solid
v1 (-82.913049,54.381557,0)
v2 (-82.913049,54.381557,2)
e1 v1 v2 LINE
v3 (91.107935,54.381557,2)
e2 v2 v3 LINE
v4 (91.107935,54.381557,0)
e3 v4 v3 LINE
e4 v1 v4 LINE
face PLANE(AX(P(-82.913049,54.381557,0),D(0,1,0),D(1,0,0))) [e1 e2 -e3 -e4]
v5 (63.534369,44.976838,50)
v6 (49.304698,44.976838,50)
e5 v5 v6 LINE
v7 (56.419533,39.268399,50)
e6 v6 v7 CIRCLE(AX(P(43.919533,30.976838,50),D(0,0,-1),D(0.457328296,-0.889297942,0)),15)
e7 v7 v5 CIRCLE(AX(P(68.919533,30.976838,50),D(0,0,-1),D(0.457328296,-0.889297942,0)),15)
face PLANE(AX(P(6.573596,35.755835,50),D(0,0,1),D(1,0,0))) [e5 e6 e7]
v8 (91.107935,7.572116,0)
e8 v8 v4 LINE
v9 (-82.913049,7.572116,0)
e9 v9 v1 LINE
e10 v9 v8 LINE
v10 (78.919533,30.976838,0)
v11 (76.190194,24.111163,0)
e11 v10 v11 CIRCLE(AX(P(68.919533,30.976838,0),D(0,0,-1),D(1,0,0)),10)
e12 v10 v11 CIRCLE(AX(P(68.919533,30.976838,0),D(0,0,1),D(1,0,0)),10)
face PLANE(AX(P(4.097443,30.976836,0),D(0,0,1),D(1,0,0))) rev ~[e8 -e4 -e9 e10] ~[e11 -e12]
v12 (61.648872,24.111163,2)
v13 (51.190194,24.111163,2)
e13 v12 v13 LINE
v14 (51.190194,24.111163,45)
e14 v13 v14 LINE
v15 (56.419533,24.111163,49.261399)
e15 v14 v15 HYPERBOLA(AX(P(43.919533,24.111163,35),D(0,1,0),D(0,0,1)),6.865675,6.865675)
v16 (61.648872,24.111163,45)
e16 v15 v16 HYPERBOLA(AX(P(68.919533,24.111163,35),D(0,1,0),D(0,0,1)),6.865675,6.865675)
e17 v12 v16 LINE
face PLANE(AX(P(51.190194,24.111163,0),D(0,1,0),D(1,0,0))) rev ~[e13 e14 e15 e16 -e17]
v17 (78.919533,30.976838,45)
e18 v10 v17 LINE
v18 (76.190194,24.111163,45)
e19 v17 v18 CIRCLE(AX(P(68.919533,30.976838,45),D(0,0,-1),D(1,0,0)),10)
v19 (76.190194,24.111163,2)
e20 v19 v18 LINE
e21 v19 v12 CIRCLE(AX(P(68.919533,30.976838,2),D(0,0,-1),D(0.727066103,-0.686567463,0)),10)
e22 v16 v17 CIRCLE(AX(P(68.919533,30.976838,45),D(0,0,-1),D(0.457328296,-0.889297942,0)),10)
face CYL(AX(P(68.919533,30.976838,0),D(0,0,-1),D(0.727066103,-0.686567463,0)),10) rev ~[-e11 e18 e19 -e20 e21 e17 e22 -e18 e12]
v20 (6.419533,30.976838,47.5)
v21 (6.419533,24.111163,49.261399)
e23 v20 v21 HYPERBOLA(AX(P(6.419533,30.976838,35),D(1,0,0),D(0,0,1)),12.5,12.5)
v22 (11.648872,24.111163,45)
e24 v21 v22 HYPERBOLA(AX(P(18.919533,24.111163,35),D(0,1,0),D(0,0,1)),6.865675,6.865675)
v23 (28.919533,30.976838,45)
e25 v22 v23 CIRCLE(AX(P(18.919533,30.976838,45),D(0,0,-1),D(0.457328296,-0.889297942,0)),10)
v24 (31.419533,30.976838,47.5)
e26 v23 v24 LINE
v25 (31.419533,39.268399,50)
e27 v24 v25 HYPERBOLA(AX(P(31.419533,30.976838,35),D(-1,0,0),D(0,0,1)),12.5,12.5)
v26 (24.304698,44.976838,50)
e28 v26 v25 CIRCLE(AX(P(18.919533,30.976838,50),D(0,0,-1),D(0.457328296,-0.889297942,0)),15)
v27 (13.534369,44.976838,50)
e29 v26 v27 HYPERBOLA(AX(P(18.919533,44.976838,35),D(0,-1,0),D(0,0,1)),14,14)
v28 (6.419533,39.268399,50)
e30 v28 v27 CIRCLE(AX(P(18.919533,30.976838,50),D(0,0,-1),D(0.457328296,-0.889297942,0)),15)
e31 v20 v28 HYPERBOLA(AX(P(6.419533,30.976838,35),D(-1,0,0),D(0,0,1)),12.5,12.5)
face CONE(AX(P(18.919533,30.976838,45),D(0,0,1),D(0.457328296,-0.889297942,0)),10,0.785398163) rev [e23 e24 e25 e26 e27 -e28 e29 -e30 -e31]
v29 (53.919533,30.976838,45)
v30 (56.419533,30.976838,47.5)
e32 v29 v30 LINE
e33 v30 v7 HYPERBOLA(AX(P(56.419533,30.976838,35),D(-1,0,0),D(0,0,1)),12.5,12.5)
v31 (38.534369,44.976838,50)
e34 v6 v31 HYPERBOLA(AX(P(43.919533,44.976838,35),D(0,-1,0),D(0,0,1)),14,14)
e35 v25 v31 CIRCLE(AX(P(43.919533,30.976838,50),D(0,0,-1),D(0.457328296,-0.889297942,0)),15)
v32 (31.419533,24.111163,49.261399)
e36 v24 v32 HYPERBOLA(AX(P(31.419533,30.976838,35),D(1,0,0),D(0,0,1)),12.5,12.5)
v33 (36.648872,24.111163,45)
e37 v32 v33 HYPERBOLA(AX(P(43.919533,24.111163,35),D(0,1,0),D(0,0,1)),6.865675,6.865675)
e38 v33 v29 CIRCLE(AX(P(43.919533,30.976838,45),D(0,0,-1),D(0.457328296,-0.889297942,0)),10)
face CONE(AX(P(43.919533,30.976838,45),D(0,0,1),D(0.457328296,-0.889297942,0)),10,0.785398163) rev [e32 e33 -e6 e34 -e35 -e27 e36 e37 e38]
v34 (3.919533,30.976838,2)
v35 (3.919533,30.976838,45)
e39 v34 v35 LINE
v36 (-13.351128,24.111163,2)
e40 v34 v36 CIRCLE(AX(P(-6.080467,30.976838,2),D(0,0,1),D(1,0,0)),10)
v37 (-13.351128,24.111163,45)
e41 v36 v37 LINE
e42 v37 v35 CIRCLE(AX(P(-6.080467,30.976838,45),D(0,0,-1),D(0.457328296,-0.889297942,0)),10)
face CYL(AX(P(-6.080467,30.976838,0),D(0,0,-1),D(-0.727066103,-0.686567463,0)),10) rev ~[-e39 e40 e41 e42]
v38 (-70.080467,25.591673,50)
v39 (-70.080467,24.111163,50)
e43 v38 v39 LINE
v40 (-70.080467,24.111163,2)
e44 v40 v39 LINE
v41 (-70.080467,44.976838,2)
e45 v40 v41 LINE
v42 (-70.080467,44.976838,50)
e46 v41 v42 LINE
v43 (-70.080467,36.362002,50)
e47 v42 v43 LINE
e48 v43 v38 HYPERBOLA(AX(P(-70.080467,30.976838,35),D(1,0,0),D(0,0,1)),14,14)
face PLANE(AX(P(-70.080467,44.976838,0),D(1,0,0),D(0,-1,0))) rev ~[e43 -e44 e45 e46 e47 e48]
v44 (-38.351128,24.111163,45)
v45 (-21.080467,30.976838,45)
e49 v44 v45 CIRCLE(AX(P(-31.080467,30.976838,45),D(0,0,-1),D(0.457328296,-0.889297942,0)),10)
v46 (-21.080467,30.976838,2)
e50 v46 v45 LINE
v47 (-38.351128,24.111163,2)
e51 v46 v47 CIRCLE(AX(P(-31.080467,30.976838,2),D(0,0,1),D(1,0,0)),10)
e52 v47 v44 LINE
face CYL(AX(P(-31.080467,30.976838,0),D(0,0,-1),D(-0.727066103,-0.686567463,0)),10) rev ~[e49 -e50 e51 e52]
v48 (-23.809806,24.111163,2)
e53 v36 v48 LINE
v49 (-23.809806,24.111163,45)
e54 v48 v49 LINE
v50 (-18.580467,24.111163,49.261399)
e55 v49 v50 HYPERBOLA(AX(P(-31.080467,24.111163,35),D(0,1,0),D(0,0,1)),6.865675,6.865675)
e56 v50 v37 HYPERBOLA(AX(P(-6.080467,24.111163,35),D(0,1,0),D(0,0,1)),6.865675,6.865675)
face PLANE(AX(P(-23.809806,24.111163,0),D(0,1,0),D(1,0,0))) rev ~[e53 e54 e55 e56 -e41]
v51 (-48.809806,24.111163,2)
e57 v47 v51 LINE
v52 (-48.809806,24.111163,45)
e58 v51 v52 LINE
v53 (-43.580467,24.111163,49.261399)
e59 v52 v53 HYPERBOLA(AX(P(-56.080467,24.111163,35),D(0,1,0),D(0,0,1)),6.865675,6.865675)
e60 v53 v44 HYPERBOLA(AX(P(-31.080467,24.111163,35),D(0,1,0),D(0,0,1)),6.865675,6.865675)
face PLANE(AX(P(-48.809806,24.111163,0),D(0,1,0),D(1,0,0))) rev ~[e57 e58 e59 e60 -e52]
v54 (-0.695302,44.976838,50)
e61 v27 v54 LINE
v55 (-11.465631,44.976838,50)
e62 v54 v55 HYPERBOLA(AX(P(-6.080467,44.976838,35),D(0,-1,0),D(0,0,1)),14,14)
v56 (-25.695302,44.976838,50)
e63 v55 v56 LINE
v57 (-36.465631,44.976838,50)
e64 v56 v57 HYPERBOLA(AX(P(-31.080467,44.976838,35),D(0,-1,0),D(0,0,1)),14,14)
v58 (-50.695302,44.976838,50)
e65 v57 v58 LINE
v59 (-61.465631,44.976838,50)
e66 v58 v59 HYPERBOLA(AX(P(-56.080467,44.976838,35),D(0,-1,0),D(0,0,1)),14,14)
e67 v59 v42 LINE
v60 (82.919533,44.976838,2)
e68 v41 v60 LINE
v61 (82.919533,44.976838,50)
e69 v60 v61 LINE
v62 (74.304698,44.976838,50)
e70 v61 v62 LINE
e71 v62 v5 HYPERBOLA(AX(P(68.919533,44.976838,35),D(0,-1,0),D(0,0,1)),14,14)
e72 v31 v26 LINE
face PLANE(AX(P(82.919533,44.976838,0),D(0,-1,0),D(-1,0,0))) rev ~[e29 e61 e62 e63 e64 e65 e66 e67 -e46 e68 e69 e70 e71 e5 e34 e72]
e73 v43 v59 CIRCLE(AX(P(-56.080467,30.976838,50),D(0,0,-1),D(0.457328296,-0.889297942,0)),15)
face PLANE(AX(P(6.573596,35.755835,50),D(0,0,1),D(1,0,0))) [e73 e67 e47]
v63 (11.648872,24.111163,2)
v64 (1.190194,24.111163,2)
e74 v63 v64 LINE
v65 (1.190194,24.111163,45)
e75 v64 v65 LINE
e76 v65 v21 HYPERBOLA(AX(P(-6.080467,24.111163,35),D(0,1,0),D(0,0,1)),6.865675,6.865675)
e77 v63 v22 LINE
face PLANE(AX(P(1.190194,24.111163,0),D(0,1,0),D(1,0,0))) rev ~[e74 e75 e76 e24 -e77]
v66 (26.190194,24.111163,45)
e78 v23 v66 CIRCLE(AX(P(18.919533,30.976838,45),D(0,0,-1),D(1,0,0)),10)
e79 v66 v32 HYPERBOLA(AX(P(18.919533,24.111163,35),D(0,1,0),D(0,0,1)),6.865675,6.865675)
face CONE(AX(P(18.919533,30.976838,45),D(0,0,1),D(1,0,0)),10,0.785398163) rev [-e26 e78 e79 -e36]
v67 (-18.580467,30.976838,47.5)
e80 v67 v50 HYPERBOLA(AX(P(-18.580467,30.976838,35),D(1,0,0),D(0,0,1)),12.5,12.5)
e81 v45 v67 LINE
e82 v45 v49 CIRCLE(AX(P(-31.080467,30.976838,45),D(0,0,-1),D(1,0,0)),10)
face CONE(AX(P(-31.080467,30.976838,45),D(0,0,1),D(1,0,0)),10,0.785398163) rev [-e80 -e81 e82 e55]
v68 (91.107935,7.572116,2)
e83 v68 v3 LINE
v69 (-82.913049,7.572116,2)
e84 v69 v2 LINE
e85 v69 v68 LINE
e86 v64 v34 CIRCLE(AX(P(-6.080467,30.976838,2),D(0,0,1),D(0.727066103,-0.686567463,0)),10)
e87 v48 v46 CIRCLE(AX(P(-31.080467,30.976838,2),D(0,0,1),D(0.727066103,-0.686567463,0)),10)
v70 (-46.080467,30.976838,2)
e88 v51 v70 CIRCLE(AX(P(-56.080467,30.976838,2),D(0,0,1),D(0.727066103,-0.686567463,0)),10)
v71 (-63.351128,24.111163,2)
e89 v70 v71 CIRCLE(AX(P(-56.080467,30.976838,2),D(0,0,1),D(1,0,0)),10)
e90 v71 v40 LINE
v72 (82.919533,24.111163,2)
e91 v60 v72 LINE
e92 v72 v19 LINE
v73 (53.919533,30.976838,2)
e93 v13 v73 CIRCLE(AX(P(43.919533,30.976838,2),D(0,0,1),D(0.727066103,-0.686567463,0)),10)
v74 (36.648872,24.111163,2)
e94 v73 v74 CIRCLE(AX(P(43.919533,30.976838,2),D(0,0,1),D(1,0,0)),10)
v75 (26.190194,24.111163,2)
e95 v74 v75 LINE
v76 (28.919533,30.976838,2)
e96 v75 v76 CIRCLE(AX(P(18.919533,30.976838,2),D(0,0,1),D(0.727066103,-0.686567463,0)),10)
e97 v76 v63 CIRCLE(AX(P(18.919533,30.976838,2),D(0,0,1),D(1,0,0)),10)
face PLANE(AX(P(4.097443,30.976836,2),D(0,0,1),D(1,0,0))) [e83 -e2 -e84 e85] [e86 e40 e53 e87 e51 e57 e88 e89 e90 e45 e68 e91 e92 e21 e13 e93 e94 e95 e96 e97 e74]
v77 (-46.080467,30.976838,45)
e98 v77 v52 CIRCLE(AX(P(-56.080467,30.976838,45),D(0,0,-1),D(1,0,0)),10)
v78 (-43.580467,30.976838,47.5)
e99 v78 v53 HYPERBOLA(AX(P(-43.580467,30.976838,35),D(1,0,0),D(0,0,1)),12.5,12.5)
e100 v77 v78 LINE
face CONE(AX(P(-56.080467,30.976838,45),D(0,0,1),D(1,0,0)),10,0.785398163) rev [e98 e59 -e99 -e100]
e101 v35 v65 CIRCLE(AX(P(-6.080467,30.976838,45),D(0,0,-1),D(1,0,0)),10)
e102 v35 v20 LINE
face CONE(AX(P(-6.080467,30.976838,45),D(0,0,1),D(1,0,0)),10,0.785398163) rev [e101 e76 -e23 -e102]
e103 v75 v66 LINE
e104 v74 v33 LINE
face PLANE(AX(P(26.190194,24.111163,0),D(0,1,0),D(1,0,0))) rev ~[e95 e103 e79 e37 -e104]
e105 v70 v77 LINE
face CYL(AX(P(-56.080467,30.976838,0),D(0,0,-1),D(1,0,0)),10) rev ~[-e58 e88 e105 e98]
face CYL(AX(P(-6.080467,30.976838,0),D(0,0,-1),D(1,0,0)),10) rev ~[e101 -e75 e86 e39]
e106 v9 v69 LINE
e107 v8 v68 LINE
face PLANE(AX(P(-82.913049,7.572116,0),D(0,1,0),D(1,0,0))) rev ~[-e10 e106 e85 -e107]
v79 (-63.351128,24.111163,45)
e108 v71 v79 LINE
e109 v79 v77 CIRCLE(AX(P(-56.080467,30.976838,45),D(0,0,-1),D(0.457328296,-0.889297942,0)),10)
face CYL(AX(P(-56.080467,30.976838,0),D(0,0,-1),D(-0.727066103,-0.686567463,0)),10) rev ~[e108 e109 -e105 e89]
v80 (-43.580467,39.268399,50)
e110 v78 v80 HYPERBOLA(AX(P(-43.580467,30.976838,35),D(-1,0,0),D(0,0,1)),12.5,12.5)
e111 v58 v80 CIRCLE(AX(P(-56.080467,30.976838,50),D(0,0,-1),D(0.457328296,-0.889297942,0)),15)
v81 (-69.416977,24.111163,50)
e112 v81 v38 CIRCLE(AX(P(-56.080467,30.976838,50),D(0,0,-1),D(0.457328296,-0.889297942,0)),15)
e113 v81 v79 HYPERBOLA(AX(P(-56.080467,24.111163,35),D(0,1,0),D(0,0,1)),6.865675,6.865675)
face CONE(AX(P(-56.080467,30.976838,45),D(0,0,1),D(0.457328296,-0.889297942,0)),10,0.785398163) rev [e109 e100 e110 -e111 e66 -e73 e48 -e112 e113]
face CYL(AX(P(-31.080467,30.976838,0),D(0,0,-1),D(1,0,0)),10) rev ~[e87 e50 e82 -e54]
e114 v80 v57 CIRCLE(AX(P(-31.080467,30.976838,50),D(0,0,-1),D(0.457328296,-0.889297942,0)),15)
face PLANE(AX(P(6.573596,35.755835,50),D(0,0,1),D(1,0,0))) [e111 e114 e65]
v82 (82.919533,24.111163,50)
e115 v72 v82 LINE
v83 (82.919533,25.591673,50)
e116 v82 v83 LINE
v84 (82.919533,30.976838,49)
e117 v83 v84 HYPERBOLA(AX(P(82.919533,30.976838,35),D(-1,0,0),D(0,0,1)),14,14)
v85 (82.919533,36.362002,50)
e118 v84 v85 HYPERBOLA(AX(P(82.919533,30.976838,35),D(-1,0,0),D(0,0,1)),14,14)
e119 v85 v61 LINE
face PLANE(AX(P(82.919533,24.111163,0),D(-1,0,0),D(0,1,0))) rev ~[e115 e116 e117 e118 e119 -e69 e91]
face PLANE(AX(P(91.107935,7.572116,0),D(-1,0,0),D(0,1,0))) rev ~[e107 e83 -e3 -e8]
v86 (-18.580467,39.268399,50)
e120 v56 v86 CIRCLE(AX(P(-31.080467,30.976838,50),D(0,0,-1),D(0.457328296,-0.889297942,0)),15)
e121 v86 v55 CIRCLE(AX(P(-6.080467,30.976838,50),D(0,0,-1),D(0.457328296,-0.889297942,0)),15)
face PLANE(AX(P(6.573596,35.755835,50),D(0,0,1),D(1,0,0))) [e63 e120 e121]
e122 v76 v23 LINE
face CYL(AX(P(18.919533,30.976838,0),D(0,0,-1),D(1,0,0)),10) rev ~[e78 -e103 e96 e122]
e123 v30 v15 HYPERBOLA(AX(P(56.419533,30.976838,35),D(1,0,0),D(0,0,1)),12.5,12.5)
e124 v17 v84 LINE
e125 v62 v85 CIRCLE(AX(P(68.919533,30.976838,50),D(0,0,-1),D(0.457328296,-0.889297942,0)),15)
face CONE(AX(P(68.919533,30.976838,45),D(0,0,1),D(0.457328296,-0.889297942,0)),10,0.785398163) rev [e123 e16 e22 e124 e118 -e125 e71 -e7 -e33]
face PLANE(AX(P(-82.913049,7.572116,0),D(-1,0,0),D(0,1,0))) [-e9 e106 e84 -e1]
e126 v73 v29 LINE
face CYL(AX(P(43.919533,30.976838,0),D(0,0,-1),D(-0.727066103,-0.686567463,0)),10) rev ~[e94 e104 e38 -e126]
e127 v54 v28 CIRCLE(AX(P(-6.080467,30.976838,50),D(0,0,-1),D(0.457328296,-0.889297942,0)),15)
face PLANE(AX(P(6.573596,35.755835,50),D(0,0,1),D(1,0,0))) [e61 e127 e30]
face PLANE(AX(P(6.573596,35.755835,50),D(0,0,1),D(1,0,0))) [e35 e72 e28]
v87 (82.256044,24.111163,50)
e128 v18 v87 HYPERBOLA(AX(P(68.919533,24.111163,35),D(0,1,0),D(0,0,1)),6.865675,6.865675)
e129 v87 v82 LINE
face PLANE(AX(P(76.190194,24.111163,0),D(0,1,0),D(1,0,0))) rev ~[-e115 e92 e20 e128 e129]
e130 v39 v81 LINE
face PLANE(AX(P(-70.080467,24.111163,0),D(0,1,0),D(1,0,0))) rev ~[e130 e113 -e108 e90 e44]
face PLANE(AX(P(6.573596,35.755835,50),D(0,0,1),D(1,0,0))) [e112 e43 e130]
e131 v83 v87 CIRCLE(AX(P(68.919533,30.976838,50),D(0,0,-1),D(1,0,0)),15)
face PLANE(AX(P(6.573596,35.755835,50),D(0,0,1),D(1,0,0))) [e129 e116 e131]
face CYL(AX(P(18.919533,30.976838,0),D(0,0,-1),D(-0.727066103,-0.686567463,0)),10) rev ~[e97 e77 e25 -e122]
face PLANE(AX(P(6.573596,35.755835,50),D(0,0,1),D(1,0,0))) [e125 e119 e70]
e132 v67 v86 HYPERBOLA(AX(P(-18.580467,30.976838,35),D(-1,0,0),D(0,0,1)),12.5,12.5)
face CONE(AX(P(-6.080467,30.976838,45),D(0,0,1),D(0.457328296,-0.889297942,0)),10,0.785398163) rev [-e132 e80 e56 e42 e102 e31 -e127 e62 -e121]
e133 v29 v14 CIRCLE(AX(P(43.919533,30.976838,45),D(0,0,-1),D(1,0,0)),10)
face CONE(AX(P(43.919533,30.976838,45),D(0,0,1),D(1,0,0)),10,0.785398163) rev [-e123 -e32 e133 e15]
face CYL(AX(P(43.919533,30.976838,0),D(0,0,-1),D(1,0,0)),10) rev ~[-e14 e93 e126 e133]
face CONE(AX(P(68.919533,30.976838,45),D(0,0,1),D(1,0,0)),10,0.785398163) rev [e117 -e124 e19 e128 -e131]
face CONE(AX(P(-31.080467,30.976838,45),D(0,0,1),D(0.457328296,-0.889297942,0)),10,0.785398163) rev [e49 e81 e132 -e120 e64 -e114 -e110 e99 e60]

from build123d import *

# Parameters (mm, degrees)
F1_DEPTH     = 50
F0_W         = 174.0209832788
F0_H         = 46.8094409443
F2_DEPTH     = 2
F3_T2_ANGLE  = 297.2148412711
F3_T4_ANGLE  = 297.2148412711
F3_T6_ANGLE  = 297.2148412711
F3_T8_ANGLE  = 297.2148412711
F3_T10_ANGLE = 297.2148412711
F3_T12_ANGLE = 297.2148412711
F3_T14_ANGLE = 117.0391625113
F3_T16_ANGLE = 117.0391625113
F3_T18_ANGLE = 117.0391625113
F3_T20_ANGLE = 117.0391625113
F3_T22_ANGLE = 117.0391625113
F3_T24_ANGLE = 117.0391625113


# Not quite as in the source:
# - a fillet or chamfer that OpenCascade refuses, or shapes differently, is made with other operations: its cross-section is extruded or revolved along the edge and cut away or added


with BuildPart() as f1:
    # F0 (on Top) → F1 (new body)
    with BuildSketch(Plane.XY):
        with BuildLine():
            ThreePointArc((-63.3511276029, 24.1111628711), (-59.7746098829, 40.2694854105), (-46.0804665685, 30.9768375009))
            ThreePointArc((-46.0804665685, 30.9768375009), (-46.7878186589, 27.2826941865), (-48.809805534, 24.1111628711))
            Line((-48.809805534, 24.1111628711), (-38.3511276029, 24.1111628711))
            ThreePointArc((-38.3511276029, 24.1111628711), (-34.7746098829, 40.2694854105), (-21.0804665685, 30.9768375009))
            ThreePointArc((-21.0804665685, 30.9768375009), (-21.7878186589, 27.2826941865), (-23.809805534, 24.1111628711))
            Line((-23.809805534, 24.1111628711), (-13.3511276029, 24.1111628711))
            ThreePointArc((-13.3511276029, 24.1111628711), (-9.7746098829, 40.2694854105), (3.9195334315, 30.9768375009))
            ThreePointArc((3.9195334315, 30.9768375009), (3.2121813411, 27.2826941865), (1.190194466, 24.1111628711))
            Line((1.190194466, 24.1111628711), (11.6488723971, 24.1111628711))
            ThreePointArc((11.6488723971, 24.1111628711), (15.2253901171, 40.2694854105), (28.9195334315, 30.9768375009))
            ThreePointArc((28.9195334315, 30.9768375009), (28.2121813411, 27.2826941865), (26.190194466, 24.1111628711))
            Line((26.190194466, 24.1111628711), (36.6488723971, 24.1111628711))
            ThreePointArc((36.6488723971, 24.1111628711), (40.2253901171, 40.2694854105), (53.9195334315, 30.9768375009))
            ThreePointArc((53.9195334315, 30.9768375009), (53.2121813411, 27.2826941865), (51.190194466, 24.1111628711))
            Line((51.190194466, 24.1111628711), (61.6488723971, 24.1111628711))
            ThreePointArc((61.6488723971, 24.1111628711), (65.2253901171, 40.2694854105), (78.9195334315, 30.9768375009))
            ThreePointArc((78.9195334315, 30.9768375009), (78.2121813411, 27.2826941865), (76.190194466, 24.1111628711))
            Line((76.190194466, 24.1111628711), (82.9195334315, 24.1111628711))
            Line((82.9195334315, 24.1111628711), (82.9195334315, 44.9768375009))
            Line((82.9195334315, 44.9768375009), (-70.0804665685, 44.9768375009))
            Line((-70.0804665685, 44.9768375009), (-70.0804665685, 24.1111628711))
            Line((-70.0804665685, 24.1111628711), (-63.3511276029, 24.1111628711))
        make_face()
    extrude(amount=F1_DEPTH)

    # F0 (on Top) → F2 (join)
    with BuildSketch(Plane.XY):
        with Locations((4.097443074, 30.9768363368)):
            Rectangle(F0_W, F0_H)
        Polygon((-70.0804665685, 16.9768375009), (-70.0804665685, 24.1111628711), (-70.0804665685, 44.9768375009), (82.9195334315, 44.9768375009), (82.9195334315, 24.1111628711), (82.9195334315, 16.9768375009), align=None, mode=Mode.SUBTRACT)
        with BuildLine():
            ThreePointArc((-48.809805534, 24.1111628711), (-56.0804665685, 20.9768375009), (-63.3511276029, 24.1111628711))
            Line((-63.3511276029, 24.1111628711), (-70.0804665685, 24.1111628711))
            Line((-70.0804665685, 24.1111628711), (-70.0804665685, 16.9768375009))
            Line((-70.0804665685, 16.9768375009), (82.9195334315, 16.9768375009))
            Line((82.9195334315, 16.9768375009), (82.9195334315, 24.1111628711))
            Line((82.9195334315, 24.1111628711), (76.190194466, 24.1111628711))
            ThreePointArc((76.190194466, 24.1111628711), (68.9195334315, 20.9768375009), (61.6488723971, 24.1111628711))
            Line((61.6488723971, 24.1111628711), (51.190194466, 24.1111628711))
            ThreePointArc((51.190194466, 24.1111628711), (43.9195334315, 20.9768375009), (36.6488723971, 24.1111628711))
            Line((36.6488723971, 24.1111628711), (26.190194466, 24.1111628711))
            ThreePointArc((26.190194466, 24.1111628711), (18.9195334315, 20.9768375009), (11.6488723971, 24.1111628711))
            Line((11.6488723971, 24.1111628711), (1.190194466, 24.1111628711))
            ThreePointArc((1.190194466, 24.1111628711), (-6.0804665685, 20.9768375009), (-13.3511276029, 24.1111628711))
            Line((-13.3511276029, 24.1111628711), (-23.809805534, 24.1111628711))
            ThreePointArc((-23.809805534, 24.1111628711), (-31.0804665685, 20.9768375009), (-38.3511276029, 24.1111628711))
            Line((-38.3511276029, 24.1111628711), (-48.809805534, 24.1111628711))
        make_face()
        with BuildLine():
            ThreePointArc((-48.809805534, 24.1111628711), (-46.7878186589, 27.2826941865), (-46.0804665685, 30.9768375009))
            ThreePointArc((-46.0804665685, 30.9768375009), (-59.7746098829, 40.2694854105), (-63.3511276029, 24.1111628711))
            Line((-63.3511276029, 24.1111628711), (-48.809805534, 24.1111628711))
        make_face()
        with BuildLine():
            Line((-48.809805534, 24.1111628711), (-63.3511276029, 24.1111628711))
            ThreePointArc((-63.3511276029, 24.1111628711), (-56.0804665685, 20.9768375009), (-48.809805534, 24.1111628711))
        make_face()
        with BuildLine():
            ThreePointArc((-21.0804665685, 30.9768375009), (-34.7746098829, 40.2694854105), (-38.3511276029, 24.1111628711))
            Line((-38.3511276029, 24.1111628711), (-23.809805534, 24.1111628711))
            ThreePointArc((-23.809805534, 24.1111628711), (-21.7878186589, 27.2826941865), (-21.0804665685, 30.9768375009))
        make_face()
        with BuildLine():
            Line((-23.809805534, 24.1111628711), (-38.3511276029, 24.1111628711))
            ThreePointArc((-38.3511276029, 24.1111628711), (-31.0804665685, 20.9768375009), (-23.809805534, 24.1111628711))
        make_face()
        with BuildLine():
            ThreePointArc((3.9195334315, 30.9768375009), (-9.7746098829, 40.2694854105), (-13.3511276029, 24.1111628711))
            Line((-13.3511276029, 24.1111628711), (1.190194466, 24.1111628711))
            ThreePointArc((1.190194466, 24.1111628711), (3.2121813411, 27.2826941865), (3.9195334315, 30.9768375009))
        make_face()
        with BuildLine():
            Line((1.190194466, 24.1111628711), (-13.3511276029, 24.1111628711))
            ThreePointArc((-13.3511276029, 24.1111628711), (-6.0804665685, 20.9768375009), (1.190194466, 24.1111628711))
        make_face()
        with BuildLine():
            ThreePointArc((28.9195334315, 30.9768375009), (15.2253901171, 40.2694854105), (11.6488723971, 24.1111628711))
            Line((11.6488723971, 24.1111628711), (26.190194466, 24.1111628711))
            ThreePointArc((26.190194466, 24.1111628711), (28.2121813411, 27.2826941865), (28.9195334315, 30.9768375009))
        make_face()
        with BuildLine():
            Line((26.190194466, 24.1111628711), (11.6488723971, 24.1111628711))
            ThreePointArc((11.6488723971, 24.1111628711), (18.9195334315, 20.9768375009), (26.190194466, 24.1111628711))
        make_face()
        with BuildLine():
            Line((36.6488723971, 24.1111628711), (51.190194466, 24.1111628711))
            ThreePointArc((51.190194466, 24.1111628711), (53.2121813411, 27.2826941865), (53.9195334315, 30.9768375009))
            ThreePointArc((53.9195334315, 30.9768375009), (40.2253901171, 40.2694854105), (36.6488723971, 24.1111628711))
        make_face()
        with BuildLine():
            ThreePointArc((36.6488723971, 24.1111628711), (43.9195334315, 20.9768375009), (51.190194466, 24.1111628711))
            Line((51.190194466, 24.1111628711), (36.6488723971, 24.1111628711))
        make_face()
    extrude(amount=F2_DEPTH)

    # F3: chamfer of 5 on 6 edges, made by hand

    # F3_s1 → F3_t2 (revolve, cut)
    with BuildSketch(Plane(origin=(-31.7529692139, -16.3292082814, 0), x_dir=(0, 0, 1), z_dir=(0.8892979418, 0.4573282964, 0))):
        Polygon((45, -43.1948220704), (50, -38.1948220704), (50, -43.1948220704), align=None)
    revolve(axis=Axis((-56.0804665685, 30.9768375009, 50), (0, 0, -1)), revolution_arc=F3_T2_ANGLE, mode=Mode.SUBTRACT)

    # F3_s3 → F3_t4 (revolve, cut)
    with BuildSketch(Plane(origin=(-11.981698481, -6.1616804635, 0), x_dir=(0, 0, 1), z_dir=(0.8892979418, 0.4573282964, 0))):
        Polygon((45, -31.7616146605), (50, -26.7616146605), (50, -31.7616146605), align=None)
    revolve(axis=Axis((-31.0804665685, 30.9768375009, 50), (0, 0, -1)), revolution_arc=F3_T4_ANGLE, mode=Mode.SUBTRACT)

    # F3_s5 → F3_t6 (revolve, cut)
    with BuildSketch(Plane(origin=(7.7895722518, 4.0058473545, 0), x_dir=(0, 0, 1), z_dir=(0.8892979418, 0.4573282964, 0))):
        Polygon((45, -20.3284072505), (50, -15.3284072505), (50, -20.3284072505), align=None)
    revolve(axis=Axis((-6.0804665685, 30.9768375009, 50), (0, 0, -1)), revolution_arc=F3_T6_ANGLE, mode=Mode.SUBTRACT)

    # F3_s7 → F3_t8 (revolve, cut)
    with BuildSketch(Plane(origin=(27.5608429847, 14.1733751725, 0), x_dir=(0, 0, 1), z_dir=(0.8892979418, 0.4573282964, 0))):
        Polygon((45, -8.8951998406), (50, -3.8951998406), (50, -8.8951998406), align=None)
    revolve(axis=Axis((18.9195334315, 30.9768375009, 50), (0, 0, -1)), revolution_arc=F3_T8_ANGLE, mode=Mode.SUBTRACT)

    # F3_s9 → F3_t10 (revolve, cut)
    with BuildSketch(Plane(origin=(47.3321137176, 24.3409029904, 0), x_dir=(0, 0, 1), z_dir=(0.8892979418, 0.4573282964, 0))):
        Polygon((45, 2.5380075693), (50, 7.5380075693), (50, 2.5380075693), align=None)
    revolve(axis=Axis((43.9195334315, 30.9768375009, 50), (0, 0, -1)), revolution_arc=F3_T10_ANGLE, mode=Mode.SUBTRACT)

    # F3_s11 → F3_t12 (revolve, cut)
    with BuildSketch(Plane(origin=(67.1033844505, 34.5084308084, 0), x_dir=(0, 0, 1), z_dir=(0.8892979418, 0.4573282964, 0))):
        Polygon((45, 13.9712149792), (50, 18.9712149792), (50, 13.9712149792), align=None)
    revolve(axis=Axis((68.9195334315, 30.9768375009, 50), (0, 0, -1)), revolution_arc=F3_T12_ANGLE, mode=Mode.SUBTRACT)

    # F3_s13 → F3_t14 (revolve, cut)
    with BuildSketch(Plane.XZ.offset(-30.9768375009)):
        Polygon((78.9195334315, 45), (83.9195334315, 50), (78.9195334315, 50), align=None)
    revolve(axis=Axis((68.9195334315, 30.9768375009, 50), (0, 0, -1)), revolution_arc=F3_T14_ANGLE, mode=Mode.SUBTRACT)

    # F3_s15 → F3_t16 (revolve, cut)
    with BuildSketch(Plane.XZ.offset(-30.9768375009)):
        Polygon((53.9195334315, 45), (58.9195334315, 50), (53.9195334315, 50), align=None)
    revolve(axis=Axis((43.9195334315, 30.9768375009, 50), (0, 0, -1)), revolution_arc=F3_T16_ANGLE, mode=Mode.SUBTRACT)

    # F3_s17 → F3_t18 (revolve, cut)
    with BuildSketch(Plane.XZ.offset(-30.9768375009)):
        Polygon((28.9195334315, 45), (33.9195334315, 50), (28.9195334315, 50), align=None)
    revolve(axis=Axis((18.9195334315, 30.9768375009, 50), (0, 0, -1)), revolution_arc=F3_T18_ANGLE, mode=Mode.SUBTRACT)

    # F3_s19 → F3_t20 (revolve, cut)
    with BuildSketch(Plane.XZ.offset(-30.9768375009)):
        Polygon((3.9195334315, 45), (8.9195334315, 50), (3.9195334315, 50), align=None)
    revolve(axis=Axis((-6.0804665685, 30.9768375009, 50), (0, 0, -1)), revolution_arc=F3_T20_ANGLE, mode=Mode.SUBTRACT)

    # F3_s21 → F3_t22 (revolve, cut)
    with BuildSketch(Plane.XZ.offset(-30.9768375009)):
        Polygon((-21.0804665685, 45), (-16.0804665685, 50), (-21.0804665685, 50), align=None)
    revolve(axis=Axis((-31.0804665685, 30.9768375009, 50), (0, 0, -1)), revolution_arc=F3_T22_ANGLE, mode=Mode.SUBTRACT)

    # F3_s23 → F3_t24 (revolve, cut)
    with BuildSketch(Plane.XZ.offset(-30.9768375009)):
        Polygon((-46.0804665685, 45), (-41.0804665685, 50), (-46.0804665685, 50), align=None)
    revolve(axis=Axis((-56.0804665685, 30.9768375009, 50), (0, 0, -1)), revolution_arc=F3_T24_ANGLE, mode=Mode.SUBTRACT)


solid = f1.part
